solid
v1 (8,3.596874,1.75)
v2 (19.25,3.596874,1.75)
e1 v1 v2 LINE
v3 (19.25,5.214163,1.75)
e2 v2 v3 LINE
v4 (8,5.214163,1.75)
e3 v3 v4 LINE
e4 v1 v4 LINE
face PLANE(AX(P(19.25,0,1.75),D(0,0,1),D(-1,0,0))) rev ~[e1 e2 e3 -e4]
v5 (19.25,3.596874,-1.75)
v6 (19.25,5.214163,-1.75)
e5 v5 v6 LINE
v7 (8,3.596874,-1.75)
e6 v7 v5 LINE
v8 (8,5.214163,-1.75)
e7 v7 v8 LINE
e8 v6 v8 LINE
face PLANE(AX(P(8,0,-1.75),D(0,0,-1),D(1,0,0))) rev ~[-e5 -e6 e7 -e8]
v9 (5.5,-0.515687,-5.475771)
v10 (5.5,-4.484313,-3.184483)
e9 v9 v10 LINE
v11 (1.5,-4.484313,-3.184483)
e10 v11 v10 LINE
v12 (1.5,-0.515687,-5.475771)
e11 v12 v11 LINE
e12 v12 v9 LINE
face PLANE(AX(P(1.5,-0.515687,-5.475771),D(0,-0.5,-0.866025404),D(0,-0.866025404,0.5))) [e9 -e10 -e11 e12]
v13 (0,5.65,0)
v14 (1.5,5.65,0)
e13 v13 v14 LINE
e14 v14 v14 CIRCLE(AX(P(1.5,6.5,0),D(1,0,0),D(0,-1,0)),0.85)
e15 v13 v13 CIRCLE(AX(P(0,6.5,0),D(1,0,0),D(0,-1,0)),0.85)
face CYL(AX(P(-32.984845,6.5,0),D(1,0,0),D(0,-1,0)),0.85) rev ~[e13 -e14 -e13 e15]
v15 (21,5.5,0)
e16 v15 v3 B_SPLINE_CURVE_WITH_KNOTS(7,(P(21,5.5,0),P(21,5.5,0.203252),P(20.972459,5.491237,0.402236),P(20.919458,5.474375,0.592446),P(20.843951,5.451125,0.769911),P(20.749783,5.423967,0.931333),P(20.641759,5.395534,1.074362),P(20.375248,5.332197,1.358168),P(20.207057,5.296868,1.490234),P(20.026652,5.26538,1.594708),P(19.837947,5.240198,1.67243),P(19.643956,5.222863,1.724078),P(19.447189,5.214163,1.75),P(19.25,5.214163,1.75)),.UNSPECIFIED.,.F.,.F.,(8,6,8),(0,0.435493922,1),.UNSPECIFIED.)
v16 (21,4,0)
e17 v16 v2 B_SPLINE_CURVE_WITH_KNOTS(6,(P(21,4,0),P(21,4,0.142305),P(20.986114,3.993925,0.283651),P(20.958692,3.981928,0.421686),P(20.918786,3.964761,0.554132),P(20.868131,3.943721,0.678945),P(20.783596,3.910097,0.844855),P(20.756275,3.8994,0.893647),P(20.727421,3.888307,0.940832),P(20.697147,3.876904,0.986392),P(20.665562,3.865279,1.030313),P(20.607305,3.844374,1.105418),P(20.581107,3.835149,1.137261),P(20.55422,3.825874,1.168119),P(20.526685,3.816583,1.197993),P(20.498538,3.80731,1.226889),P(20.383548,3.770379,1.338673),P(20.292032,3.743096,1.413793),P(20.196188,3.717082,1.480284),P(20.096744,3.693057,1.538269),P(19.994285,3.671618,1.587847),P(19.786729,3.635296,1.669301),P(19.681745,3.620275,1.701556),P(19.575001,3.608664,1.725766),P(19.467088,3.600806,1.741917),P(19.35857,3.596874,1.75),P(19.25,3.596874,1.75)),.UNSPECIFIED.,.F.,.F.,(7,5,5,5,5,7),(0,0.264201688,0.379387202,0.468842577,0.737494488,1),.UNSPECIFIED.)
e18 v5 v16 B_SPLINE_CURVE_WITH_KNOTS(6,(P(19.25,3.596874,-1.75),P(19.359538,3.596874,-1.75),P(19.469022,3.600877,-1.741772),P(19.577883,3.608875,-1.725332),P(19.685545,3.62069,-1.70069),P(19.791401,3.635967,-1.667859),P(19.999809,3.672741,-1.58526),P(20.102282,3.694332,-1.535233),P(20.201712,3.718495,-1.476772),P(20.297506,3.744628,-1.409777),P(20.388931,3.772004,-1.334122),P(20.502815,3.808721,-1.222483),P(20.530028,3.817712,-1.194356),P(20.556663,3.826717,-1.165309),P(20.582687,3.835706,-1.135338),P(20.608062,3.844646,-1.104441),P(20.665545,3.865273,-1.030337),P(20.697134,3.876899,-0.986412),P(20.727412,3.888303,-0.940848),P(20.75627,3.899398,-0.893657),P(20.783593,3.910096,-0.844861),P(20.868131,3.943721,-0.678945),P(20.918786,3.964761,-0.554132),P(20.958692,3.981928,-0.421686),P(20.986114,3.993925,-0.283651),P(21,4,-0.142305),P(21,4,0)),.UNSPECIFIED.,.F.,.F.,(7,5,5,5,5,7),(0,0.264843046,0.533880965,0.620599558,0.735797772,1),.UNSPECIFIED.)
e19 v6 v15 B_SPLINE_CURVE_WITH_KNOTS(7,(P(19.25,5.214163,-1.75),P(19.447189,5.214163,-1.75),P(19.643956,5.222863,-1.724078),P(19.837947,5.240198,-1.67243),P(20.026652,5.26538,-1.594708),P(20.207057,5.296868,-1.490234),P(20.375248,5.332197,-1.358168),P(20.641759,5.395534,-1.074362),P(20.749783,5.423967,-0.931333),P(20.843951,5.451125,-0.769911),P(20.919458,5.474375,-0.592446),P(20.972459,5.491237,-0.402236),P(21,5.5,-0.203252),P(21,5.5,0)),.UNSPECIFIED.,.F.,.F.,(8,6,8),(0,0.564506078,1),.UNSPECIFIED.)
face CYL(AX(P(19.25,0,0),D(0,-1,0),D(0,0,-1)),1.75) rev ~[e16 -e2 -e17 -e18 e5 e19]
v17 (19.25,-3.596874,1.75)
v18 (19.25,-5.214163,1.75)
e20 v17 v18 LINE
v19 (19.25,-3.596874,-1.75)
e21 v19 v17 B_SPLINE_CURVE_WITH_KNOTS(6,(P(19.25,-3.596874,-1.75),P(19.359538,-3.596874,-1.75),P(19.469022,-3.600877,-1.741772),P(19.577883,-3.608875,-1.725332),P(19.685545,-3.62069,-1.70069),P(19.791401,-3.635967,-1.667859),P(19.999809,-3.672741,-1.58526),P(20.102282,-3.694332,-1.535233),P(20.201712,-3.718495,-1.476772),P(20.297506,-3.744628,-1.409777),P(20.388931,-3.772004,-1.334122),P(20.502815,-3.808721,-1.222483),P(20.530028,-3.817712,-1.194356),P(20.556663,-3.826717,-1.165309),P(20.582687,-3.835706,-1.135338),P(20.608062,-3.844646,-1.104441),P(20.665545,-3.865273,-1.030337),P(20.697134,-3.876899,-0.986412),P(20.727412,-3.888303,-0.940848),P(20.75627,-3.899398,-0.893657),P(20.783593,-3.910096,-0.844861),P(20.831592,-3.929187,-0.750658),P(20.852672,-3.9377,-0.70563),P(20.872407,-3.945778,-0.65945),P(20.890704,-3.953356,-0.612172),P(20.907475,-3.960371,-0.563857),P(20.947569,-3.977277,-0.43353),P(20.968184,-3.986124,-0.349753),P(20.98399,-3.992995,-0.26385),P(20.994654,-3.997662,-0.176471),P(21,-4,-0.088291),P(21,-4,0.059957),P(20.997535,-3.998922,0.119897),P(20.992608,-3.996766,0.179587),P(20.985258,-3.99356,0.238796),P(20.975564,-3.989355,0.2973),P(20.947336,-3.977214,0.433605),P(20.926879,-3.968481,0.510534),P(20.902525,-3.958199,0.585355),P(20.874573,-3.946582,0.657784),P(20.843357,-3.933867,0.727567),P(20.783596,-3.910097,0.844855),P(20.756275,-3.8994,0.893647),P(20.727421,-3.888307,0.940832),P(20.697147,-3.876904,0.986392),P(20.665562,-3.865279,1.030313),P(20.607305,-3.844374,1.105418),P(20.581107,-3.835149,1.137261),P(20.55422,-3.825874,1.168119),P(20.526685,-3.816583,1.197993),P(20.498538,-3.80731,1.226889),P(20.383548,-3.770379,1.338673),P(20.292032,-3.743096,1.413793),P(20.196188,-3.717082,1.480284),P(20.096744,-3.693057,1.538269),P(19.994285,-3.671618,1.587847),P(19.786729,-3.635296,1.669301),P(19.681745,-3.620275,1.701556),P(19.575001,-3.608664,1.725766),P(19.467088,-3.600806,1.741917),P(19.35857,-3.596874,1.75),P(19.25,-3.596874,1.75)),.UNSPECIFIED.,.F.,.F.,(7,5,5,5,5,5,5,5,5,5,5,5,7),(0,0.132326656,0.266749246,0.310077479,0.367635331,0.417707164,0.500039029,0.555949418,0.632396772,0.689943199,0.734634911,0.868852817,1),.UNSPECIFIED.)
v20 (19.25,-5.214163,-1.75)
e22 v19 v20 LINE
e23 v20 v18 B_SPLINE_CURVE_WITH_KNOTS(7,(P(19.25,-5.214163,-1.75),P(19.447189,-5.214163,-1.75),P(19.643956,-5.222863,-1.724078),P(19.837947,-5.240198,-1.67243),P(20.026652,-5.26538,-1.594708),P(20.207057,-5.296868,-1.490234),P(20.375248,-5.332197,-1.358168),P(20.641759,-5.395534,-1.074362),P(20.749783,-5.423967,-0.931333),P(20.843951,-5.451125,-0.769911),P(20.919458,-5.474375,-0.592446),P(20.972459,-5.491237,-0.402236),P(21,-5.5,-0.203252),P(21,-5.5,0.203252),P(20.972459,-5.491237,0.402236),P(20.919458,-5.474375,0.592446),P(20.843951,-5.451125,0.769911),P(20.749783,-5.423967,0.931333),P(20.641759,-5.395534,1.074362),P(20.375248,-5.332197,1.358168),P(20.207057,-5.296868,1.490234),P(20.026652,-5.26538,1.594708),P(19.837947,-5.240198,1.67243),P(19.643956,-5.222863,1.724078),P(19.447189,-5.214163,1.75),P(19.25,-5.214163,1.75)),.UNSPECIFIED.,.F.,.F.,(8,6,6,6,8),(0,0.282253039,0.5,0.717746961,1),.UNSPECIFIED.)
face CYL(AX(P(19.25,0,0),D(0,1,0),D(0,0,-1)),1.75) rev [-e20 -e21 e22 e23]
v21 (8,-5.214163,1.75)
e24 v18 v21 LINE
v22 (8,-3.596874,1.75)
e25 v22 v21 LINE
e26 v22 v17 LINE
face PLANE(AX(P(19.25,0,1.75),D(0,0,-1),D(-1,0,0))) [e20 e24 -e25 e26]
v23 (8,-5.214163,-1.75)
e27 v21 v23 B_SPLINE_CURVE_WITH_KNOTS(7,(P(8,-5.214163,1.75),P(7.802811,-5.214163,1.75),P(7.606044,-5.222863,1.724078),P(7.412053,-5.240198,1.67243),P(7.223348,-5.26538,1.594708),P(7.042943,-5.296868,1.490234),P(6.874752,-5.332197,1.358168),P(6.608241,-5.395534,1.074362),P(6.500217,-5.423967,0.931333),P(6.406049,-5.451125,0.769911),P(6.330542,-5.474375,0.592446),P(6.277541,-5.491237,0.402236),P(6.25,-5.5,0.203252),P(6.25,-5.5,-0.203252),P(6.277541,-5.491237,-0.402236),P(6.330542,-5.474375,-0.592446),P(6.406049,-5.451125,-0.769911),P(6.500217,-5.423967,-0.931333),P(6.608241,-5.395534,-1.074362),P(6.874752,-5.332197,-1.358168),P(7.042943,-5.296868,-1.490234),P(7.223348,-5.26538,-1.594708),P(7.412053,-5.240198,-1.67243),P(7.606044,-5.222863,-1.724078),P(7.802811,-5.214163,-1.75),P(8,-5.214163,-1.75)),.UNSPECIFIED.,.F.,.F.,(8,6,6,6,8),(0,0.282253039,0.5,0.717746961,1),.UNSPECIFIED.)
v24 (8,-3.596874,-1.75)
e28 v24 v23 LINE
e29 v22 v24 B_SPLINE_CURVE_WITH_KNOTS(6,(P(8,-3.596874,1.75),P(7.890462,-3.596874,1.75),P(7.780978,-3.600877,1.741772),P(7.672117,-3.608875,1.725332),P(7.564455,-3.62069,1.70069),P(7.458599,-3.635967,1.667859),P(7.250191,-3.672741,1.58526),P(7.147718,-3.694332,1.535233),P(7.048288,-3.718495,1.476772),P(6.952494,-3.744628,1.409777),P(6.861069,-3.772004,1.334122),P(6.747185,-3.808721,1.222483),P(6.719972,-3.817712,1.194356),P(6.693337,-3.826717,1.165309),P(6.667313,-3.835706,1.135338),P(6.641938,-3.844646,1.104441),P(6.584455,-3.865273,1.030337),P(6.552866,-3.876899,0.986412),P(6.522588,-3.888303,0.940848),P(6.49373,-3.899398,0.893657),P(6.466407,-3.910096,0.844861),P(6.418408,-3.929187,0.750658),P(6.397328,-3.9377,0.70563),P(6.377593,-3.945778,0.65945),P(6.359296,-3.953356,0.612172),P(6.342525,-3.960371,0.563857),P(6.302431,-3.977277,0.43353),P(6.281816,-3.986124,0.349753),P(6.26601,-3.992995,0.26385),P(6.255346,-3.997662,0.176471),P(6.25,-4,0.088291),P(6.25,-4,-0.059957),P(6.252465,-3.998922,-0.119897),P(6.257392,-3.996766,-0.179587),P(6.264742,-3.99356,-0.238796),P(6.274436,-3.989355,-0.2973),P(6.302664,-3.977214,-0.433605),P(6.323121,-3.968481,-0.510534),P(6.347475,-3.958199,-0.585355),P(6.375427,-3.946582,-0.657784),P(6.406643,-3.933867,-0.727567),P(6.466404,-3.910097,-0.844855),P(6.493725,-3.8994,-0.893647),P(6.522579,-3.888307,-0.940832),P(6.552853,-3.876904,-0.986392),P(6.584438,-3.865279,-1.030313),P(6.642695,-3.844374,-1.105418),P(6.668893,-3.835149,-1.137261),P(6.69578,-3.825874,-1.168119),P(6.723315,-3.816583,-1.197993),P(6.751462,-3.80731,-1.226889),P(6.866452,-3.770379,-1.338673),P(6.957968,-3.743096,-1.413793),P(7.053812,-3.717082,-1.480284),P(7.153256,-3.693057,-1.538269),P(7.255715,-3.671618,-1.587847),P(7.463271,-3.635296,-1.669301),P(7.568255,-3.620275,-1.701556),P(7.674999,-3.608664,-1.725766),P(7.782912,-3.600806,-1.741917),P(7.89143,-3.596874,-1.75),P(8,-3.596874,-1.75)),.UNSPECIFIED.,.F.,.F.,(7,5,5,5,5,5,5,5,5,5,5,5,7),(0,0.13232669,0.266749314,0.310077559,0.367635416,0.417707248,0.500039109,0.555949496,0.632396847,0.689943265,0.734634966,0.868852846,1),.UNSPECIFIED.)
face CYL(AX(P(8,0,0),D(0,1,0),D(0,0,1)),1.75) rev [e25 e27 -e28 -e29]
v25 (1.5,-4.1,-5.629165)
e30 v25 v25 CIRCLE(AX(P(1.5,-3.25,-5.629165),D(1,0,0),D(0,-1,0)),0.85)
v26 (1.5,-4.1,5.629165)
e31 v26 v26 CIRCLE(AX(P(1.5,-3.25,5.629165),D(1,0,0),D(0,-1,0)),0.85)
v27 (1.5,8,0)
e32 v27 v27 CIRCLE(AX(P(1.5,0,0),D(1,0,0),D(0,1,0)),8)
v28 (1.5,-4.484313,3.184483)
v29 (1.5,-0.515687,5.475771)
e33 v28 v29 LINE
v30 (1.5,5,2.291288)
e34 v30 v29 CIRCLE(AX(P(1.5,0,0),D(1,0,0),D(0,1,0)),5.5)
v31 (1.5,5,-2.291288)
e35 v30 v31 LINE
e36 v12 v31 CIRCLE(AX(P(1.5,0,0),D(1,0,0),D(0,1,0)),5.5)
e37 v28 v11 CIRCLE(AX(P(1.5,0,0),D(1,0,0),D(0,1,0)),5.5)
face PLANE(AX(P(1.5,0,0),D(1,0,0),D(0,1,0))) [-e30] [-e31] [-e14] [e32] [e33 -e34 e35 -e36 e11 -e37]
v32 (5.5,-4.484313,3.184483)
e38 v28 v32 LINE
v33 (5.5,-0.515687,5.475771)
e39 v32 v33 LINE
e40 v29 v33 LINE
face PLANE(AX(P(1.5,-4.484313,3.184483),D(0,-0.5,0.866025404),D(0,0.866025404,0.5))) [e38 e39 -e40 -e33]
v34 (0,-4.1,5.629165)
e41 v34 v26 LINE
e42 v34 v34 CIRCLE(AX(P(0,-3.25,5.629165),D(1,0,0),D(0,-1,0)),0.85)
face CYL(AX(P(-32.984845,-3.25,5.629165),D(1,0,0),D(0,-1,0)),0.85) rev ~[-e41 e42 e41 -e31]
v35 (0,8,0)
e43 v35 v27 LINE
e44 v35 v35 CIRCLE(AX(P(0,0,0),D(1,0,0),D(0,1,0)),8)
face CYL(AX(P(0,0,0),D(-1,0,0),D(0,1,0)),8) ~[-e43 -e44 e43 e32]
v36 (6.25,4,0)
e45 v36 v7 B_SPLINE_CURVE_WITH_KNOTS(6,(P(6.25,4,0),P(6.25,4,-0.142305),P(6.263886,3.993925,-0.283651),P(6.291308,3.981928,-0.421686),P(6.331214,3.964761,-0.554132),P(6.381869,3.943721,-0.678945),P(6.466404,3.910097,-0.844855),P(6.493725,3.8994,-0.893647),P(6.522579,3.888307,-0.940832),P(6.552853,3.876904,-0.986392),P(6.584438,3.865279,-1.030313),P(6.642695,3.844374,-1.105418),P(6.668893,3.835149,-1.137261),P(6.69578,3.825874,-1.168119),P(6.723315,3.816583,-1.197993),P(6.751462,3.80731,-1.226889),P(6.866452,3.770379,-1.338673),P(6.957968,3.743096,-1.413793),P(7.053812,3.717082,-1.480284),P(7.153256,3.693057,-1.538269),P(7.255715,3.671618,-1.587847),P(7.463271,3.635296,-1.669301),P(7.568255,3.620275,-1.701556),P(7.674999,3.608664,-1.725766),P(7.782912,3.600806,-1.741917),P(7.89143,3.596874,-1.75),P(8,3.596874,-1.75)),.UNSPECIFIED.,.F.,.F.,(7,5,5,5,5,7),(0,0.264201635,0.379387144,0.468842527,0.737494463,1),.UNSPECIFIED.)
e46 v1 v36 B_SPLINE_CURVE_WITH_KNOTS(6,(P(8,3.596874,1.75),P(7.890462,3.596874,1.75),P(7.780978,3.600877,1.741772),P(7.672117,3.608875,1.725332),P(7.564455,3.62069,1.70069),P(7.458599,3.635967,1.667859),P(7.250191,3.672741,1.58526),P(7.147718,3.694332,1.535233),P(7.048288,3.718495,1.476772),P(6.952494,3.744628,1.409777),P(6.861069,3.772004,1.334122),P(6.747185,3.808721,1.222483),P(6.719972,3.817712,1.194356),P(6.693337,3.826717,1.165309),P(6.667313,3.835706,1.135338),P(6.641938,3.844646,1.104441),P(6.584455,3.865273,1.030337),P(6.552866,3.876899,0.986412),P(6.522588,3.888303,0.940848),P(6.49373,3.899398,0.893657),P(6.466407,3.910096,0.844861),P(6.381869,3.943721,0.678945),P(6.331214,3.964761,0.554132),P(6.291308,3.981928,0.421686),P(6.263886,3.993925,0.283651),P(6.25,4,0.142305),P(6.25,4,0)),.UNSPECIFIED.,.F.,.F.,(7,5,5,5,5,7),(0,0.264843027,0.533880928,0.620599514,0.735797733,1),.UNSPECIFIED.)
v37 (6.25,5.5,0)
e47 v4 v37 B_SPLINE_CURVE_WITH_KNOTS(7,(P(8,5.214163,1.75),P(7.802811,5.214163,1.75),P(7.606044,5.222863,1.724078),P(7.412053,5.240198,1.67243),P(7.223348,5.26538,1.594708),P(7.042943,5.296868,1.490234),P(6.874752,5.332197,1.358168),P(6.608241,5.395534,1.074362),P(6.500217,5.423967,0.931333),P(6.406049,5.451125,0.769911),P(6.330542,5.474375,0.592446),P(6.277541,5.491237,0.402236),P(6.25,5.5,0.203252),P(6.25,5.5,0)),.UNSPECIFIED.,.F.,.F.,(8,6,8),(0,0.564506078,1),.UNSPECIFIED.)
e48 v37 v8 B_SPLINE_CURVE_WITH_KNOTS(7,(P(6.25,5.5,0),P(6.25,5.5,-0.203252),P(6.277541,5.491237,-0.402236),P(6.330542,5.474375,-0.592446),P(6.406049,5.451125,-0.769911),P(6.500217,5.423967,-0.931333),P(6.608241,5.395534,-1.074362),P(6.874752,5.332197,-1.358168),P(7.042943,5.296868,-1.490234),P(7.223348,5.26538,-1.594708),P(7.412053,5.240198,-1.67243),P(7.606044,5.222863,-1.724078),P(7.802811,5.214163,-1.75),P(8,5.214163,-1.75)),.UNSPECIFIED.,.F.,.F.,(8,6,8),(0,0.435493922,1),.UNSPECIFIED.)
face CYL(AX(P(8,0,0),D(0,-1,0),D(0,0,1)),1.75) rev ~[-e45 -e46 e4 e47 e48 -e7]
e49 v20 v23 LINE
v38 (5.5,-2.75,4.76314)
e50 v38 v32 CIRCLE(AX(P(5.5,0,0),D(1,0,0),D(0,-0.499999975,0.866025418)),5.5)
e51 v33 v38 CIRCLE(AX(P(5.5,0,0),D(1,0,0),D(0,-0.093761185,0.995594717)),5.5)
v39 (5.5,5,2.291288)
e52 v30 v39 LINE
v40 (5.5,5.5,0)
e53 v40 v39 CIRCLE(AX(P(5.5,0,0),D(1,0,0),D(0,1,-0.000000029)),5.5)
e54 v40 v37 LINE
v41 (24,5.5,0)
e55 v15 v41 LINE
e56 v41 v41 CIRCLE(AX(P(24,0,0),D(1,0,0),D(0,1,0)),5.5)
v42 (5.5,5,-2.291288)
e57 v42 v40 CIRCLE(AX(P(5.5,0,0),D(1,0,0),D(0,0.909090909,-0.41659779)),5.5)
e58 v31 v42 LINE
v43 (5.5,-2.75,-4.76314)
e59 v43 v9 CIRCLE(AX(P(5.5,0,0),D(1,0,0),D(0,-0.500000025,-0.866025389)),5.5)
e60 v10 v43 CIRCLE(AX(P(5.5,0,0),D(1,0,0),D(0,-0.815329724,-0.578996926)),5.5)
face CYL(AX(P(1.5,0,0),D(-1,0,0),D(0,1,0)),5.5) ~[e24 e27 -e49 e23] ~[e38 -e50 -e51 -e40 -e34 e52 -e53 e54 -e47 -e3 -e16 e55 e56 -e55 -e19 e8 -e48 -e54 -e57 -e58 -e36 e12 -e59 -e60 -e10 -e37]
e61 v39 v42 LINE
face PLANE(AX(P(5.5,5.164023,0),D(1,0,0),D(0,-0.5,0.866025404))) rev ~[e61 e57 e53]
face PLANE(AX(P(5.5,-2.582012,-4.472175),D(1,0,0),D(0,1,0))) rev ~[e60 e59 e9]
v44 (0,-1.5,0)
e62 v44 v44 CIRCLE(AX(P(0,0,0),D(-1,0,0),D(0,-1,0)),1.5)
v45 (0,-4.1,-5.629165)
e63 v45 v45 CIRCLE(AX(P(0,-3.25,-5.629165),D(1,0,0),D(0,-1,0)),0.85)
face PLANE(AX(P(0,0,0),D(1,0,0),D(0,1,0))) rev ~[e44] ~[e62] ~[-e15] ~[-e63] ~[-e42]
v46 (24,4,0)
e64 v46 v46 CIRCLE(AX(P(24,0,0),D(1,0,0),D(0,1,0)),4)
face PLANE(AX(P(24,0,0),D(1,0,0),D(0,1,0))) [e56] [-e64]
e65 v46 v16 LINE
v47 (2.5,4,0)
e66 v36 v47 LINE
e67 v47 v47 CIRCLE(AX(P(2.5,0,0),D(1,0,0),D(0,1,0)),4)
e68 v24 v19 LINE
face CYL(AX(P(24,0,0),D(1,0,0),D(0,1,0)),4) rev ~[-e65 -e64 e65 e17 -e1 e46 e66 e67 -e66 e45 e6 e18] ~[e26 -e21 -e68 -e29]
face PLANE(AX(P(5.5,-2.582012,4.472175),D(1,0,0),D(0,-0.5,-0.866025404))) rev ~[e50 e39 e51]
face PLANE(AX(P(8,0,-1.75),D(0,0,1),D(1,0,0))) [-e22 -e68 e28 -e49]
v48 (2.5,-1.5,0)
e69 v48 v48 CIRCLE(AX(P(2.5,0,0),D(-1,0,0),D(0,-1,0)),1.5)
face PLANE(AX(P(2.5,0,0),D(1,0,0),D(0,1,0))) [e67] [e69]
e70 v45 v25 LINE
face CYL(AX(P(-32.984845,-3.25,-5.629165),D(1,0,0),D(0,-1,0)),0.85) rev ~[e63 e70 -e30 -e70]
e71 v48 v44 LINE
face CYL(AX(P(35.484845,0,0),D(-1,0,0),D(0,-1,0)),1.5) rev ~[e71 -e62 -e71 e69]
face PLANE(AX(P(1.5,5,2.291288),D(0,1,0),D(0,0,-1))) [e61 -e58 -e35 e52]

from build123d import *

# Parameters (mm, degrees)
F0_R             = 8
F1_DEPTH         = 1.5
F2_R             = 5.5
F3_DEPTH         = 22.5
F4_R             = 4
F5_DEPTH         = 21.5
F7_D             = 1.7
F9_D             = 3
F11_DEPTH        = 8.001
F11_DEPTH_BACK   = 25
F13_DEPTH        = 4
F13_COPIES_COUNT = 3


# Not quite as in the source:
# - a pattern or mirror of a feature is missing from the dataset's text; its kind, count and spacing are read off the source's solid


with BuildPart() as f1:
    # F0 (on Right) → F1 (new body)
    with BuildSketch(Plane.YZ):
        Circle(F0_R)
    extrude(amount=F1_DEPTH)

    # F2 (on face) → F3 (join)
    with BuildSketch(Plane.YZ.offset(1.5)):
        Circle(F2_R)
    extrude(amount=F3_DEPTH)

    # F4 (on face) → F5 (cut)
    with BuildSketch(Plane.YZ.offset(24)):
        Circle(F4_R)
    extrude(amount=-F5_DEPTH, mode=Mode.SUBTRACT)

    # F7 (through all)
    with Locations(Plane(origin=(0, 0, 0), x_dir=(0, 1, 0), z_dir=(-1, 0, 0))):
        with Locations((-3.25, -5.6291651246), (6.5, 0), (-3.25, 5.6291651246)):
            Hole(F7_D / 2)

    # F9 (through all)
    with Locations(Plane.YZ.offset(2.5)):
        with Locations((0, 0)):
            Hole(F9_D / 2)

    # F10 (on Front) → F11 (cut, two sides)
    with BuildSketch(Plane.XZ) as f11_sk:
        with BuildLine():
            Line((8, -1.75), (19.25, -1.75))
            ThreePointArc((19.25, -1.75), (21, 0), (19.25, 1.75))
            Line((19.25, 1.75), (8, 1.75))
            ThreePointArc((8, 1.75), (6.25, 0), (8, -1.75))
        make_face()
    extrude(amount=-F11_DEPTH, mode=Mode.SUBTRACT)
    extrude(f11_sk.sketch, amount=F11_DEPTH_BACK, mode=Mode.SUBTRACT)

    # F12 (on face) → F13 (cut)
    with BuildSketch(Plane.YZ.offset(1.5)):
        with BuildLine():
            Line((-0.5156865167, -5.4757709427), (-4.4843134833, -3.1844830952))
            ThreePointArc((-4.4843134833, -3.1844830952), (-3.702278018, -4.0673255927), (-2.7500001403, -4.7631396398))
            ThreePointArc((-2.7500001403, -4.7631396398), (-1.6712684341, -5.2399295626), (-0.5156865167, -5.4757709427))
        make_face()
    f13 = extrude(amount=F13_DEPTH, mode=Mode.SUBTRACT)

    # F13_copies: F13 ×3 about axis
    f13_copies_axis = Axis((0, 0, 0), (1, 0, 0))
    for i in range(1, F13_COPIES_COUNT):
        add(f13.rotate(f13_copies_axis, i * 360 / F13_COPIES_COUNT), mode=Mode.SUBTRACT)


solid = f1.part
